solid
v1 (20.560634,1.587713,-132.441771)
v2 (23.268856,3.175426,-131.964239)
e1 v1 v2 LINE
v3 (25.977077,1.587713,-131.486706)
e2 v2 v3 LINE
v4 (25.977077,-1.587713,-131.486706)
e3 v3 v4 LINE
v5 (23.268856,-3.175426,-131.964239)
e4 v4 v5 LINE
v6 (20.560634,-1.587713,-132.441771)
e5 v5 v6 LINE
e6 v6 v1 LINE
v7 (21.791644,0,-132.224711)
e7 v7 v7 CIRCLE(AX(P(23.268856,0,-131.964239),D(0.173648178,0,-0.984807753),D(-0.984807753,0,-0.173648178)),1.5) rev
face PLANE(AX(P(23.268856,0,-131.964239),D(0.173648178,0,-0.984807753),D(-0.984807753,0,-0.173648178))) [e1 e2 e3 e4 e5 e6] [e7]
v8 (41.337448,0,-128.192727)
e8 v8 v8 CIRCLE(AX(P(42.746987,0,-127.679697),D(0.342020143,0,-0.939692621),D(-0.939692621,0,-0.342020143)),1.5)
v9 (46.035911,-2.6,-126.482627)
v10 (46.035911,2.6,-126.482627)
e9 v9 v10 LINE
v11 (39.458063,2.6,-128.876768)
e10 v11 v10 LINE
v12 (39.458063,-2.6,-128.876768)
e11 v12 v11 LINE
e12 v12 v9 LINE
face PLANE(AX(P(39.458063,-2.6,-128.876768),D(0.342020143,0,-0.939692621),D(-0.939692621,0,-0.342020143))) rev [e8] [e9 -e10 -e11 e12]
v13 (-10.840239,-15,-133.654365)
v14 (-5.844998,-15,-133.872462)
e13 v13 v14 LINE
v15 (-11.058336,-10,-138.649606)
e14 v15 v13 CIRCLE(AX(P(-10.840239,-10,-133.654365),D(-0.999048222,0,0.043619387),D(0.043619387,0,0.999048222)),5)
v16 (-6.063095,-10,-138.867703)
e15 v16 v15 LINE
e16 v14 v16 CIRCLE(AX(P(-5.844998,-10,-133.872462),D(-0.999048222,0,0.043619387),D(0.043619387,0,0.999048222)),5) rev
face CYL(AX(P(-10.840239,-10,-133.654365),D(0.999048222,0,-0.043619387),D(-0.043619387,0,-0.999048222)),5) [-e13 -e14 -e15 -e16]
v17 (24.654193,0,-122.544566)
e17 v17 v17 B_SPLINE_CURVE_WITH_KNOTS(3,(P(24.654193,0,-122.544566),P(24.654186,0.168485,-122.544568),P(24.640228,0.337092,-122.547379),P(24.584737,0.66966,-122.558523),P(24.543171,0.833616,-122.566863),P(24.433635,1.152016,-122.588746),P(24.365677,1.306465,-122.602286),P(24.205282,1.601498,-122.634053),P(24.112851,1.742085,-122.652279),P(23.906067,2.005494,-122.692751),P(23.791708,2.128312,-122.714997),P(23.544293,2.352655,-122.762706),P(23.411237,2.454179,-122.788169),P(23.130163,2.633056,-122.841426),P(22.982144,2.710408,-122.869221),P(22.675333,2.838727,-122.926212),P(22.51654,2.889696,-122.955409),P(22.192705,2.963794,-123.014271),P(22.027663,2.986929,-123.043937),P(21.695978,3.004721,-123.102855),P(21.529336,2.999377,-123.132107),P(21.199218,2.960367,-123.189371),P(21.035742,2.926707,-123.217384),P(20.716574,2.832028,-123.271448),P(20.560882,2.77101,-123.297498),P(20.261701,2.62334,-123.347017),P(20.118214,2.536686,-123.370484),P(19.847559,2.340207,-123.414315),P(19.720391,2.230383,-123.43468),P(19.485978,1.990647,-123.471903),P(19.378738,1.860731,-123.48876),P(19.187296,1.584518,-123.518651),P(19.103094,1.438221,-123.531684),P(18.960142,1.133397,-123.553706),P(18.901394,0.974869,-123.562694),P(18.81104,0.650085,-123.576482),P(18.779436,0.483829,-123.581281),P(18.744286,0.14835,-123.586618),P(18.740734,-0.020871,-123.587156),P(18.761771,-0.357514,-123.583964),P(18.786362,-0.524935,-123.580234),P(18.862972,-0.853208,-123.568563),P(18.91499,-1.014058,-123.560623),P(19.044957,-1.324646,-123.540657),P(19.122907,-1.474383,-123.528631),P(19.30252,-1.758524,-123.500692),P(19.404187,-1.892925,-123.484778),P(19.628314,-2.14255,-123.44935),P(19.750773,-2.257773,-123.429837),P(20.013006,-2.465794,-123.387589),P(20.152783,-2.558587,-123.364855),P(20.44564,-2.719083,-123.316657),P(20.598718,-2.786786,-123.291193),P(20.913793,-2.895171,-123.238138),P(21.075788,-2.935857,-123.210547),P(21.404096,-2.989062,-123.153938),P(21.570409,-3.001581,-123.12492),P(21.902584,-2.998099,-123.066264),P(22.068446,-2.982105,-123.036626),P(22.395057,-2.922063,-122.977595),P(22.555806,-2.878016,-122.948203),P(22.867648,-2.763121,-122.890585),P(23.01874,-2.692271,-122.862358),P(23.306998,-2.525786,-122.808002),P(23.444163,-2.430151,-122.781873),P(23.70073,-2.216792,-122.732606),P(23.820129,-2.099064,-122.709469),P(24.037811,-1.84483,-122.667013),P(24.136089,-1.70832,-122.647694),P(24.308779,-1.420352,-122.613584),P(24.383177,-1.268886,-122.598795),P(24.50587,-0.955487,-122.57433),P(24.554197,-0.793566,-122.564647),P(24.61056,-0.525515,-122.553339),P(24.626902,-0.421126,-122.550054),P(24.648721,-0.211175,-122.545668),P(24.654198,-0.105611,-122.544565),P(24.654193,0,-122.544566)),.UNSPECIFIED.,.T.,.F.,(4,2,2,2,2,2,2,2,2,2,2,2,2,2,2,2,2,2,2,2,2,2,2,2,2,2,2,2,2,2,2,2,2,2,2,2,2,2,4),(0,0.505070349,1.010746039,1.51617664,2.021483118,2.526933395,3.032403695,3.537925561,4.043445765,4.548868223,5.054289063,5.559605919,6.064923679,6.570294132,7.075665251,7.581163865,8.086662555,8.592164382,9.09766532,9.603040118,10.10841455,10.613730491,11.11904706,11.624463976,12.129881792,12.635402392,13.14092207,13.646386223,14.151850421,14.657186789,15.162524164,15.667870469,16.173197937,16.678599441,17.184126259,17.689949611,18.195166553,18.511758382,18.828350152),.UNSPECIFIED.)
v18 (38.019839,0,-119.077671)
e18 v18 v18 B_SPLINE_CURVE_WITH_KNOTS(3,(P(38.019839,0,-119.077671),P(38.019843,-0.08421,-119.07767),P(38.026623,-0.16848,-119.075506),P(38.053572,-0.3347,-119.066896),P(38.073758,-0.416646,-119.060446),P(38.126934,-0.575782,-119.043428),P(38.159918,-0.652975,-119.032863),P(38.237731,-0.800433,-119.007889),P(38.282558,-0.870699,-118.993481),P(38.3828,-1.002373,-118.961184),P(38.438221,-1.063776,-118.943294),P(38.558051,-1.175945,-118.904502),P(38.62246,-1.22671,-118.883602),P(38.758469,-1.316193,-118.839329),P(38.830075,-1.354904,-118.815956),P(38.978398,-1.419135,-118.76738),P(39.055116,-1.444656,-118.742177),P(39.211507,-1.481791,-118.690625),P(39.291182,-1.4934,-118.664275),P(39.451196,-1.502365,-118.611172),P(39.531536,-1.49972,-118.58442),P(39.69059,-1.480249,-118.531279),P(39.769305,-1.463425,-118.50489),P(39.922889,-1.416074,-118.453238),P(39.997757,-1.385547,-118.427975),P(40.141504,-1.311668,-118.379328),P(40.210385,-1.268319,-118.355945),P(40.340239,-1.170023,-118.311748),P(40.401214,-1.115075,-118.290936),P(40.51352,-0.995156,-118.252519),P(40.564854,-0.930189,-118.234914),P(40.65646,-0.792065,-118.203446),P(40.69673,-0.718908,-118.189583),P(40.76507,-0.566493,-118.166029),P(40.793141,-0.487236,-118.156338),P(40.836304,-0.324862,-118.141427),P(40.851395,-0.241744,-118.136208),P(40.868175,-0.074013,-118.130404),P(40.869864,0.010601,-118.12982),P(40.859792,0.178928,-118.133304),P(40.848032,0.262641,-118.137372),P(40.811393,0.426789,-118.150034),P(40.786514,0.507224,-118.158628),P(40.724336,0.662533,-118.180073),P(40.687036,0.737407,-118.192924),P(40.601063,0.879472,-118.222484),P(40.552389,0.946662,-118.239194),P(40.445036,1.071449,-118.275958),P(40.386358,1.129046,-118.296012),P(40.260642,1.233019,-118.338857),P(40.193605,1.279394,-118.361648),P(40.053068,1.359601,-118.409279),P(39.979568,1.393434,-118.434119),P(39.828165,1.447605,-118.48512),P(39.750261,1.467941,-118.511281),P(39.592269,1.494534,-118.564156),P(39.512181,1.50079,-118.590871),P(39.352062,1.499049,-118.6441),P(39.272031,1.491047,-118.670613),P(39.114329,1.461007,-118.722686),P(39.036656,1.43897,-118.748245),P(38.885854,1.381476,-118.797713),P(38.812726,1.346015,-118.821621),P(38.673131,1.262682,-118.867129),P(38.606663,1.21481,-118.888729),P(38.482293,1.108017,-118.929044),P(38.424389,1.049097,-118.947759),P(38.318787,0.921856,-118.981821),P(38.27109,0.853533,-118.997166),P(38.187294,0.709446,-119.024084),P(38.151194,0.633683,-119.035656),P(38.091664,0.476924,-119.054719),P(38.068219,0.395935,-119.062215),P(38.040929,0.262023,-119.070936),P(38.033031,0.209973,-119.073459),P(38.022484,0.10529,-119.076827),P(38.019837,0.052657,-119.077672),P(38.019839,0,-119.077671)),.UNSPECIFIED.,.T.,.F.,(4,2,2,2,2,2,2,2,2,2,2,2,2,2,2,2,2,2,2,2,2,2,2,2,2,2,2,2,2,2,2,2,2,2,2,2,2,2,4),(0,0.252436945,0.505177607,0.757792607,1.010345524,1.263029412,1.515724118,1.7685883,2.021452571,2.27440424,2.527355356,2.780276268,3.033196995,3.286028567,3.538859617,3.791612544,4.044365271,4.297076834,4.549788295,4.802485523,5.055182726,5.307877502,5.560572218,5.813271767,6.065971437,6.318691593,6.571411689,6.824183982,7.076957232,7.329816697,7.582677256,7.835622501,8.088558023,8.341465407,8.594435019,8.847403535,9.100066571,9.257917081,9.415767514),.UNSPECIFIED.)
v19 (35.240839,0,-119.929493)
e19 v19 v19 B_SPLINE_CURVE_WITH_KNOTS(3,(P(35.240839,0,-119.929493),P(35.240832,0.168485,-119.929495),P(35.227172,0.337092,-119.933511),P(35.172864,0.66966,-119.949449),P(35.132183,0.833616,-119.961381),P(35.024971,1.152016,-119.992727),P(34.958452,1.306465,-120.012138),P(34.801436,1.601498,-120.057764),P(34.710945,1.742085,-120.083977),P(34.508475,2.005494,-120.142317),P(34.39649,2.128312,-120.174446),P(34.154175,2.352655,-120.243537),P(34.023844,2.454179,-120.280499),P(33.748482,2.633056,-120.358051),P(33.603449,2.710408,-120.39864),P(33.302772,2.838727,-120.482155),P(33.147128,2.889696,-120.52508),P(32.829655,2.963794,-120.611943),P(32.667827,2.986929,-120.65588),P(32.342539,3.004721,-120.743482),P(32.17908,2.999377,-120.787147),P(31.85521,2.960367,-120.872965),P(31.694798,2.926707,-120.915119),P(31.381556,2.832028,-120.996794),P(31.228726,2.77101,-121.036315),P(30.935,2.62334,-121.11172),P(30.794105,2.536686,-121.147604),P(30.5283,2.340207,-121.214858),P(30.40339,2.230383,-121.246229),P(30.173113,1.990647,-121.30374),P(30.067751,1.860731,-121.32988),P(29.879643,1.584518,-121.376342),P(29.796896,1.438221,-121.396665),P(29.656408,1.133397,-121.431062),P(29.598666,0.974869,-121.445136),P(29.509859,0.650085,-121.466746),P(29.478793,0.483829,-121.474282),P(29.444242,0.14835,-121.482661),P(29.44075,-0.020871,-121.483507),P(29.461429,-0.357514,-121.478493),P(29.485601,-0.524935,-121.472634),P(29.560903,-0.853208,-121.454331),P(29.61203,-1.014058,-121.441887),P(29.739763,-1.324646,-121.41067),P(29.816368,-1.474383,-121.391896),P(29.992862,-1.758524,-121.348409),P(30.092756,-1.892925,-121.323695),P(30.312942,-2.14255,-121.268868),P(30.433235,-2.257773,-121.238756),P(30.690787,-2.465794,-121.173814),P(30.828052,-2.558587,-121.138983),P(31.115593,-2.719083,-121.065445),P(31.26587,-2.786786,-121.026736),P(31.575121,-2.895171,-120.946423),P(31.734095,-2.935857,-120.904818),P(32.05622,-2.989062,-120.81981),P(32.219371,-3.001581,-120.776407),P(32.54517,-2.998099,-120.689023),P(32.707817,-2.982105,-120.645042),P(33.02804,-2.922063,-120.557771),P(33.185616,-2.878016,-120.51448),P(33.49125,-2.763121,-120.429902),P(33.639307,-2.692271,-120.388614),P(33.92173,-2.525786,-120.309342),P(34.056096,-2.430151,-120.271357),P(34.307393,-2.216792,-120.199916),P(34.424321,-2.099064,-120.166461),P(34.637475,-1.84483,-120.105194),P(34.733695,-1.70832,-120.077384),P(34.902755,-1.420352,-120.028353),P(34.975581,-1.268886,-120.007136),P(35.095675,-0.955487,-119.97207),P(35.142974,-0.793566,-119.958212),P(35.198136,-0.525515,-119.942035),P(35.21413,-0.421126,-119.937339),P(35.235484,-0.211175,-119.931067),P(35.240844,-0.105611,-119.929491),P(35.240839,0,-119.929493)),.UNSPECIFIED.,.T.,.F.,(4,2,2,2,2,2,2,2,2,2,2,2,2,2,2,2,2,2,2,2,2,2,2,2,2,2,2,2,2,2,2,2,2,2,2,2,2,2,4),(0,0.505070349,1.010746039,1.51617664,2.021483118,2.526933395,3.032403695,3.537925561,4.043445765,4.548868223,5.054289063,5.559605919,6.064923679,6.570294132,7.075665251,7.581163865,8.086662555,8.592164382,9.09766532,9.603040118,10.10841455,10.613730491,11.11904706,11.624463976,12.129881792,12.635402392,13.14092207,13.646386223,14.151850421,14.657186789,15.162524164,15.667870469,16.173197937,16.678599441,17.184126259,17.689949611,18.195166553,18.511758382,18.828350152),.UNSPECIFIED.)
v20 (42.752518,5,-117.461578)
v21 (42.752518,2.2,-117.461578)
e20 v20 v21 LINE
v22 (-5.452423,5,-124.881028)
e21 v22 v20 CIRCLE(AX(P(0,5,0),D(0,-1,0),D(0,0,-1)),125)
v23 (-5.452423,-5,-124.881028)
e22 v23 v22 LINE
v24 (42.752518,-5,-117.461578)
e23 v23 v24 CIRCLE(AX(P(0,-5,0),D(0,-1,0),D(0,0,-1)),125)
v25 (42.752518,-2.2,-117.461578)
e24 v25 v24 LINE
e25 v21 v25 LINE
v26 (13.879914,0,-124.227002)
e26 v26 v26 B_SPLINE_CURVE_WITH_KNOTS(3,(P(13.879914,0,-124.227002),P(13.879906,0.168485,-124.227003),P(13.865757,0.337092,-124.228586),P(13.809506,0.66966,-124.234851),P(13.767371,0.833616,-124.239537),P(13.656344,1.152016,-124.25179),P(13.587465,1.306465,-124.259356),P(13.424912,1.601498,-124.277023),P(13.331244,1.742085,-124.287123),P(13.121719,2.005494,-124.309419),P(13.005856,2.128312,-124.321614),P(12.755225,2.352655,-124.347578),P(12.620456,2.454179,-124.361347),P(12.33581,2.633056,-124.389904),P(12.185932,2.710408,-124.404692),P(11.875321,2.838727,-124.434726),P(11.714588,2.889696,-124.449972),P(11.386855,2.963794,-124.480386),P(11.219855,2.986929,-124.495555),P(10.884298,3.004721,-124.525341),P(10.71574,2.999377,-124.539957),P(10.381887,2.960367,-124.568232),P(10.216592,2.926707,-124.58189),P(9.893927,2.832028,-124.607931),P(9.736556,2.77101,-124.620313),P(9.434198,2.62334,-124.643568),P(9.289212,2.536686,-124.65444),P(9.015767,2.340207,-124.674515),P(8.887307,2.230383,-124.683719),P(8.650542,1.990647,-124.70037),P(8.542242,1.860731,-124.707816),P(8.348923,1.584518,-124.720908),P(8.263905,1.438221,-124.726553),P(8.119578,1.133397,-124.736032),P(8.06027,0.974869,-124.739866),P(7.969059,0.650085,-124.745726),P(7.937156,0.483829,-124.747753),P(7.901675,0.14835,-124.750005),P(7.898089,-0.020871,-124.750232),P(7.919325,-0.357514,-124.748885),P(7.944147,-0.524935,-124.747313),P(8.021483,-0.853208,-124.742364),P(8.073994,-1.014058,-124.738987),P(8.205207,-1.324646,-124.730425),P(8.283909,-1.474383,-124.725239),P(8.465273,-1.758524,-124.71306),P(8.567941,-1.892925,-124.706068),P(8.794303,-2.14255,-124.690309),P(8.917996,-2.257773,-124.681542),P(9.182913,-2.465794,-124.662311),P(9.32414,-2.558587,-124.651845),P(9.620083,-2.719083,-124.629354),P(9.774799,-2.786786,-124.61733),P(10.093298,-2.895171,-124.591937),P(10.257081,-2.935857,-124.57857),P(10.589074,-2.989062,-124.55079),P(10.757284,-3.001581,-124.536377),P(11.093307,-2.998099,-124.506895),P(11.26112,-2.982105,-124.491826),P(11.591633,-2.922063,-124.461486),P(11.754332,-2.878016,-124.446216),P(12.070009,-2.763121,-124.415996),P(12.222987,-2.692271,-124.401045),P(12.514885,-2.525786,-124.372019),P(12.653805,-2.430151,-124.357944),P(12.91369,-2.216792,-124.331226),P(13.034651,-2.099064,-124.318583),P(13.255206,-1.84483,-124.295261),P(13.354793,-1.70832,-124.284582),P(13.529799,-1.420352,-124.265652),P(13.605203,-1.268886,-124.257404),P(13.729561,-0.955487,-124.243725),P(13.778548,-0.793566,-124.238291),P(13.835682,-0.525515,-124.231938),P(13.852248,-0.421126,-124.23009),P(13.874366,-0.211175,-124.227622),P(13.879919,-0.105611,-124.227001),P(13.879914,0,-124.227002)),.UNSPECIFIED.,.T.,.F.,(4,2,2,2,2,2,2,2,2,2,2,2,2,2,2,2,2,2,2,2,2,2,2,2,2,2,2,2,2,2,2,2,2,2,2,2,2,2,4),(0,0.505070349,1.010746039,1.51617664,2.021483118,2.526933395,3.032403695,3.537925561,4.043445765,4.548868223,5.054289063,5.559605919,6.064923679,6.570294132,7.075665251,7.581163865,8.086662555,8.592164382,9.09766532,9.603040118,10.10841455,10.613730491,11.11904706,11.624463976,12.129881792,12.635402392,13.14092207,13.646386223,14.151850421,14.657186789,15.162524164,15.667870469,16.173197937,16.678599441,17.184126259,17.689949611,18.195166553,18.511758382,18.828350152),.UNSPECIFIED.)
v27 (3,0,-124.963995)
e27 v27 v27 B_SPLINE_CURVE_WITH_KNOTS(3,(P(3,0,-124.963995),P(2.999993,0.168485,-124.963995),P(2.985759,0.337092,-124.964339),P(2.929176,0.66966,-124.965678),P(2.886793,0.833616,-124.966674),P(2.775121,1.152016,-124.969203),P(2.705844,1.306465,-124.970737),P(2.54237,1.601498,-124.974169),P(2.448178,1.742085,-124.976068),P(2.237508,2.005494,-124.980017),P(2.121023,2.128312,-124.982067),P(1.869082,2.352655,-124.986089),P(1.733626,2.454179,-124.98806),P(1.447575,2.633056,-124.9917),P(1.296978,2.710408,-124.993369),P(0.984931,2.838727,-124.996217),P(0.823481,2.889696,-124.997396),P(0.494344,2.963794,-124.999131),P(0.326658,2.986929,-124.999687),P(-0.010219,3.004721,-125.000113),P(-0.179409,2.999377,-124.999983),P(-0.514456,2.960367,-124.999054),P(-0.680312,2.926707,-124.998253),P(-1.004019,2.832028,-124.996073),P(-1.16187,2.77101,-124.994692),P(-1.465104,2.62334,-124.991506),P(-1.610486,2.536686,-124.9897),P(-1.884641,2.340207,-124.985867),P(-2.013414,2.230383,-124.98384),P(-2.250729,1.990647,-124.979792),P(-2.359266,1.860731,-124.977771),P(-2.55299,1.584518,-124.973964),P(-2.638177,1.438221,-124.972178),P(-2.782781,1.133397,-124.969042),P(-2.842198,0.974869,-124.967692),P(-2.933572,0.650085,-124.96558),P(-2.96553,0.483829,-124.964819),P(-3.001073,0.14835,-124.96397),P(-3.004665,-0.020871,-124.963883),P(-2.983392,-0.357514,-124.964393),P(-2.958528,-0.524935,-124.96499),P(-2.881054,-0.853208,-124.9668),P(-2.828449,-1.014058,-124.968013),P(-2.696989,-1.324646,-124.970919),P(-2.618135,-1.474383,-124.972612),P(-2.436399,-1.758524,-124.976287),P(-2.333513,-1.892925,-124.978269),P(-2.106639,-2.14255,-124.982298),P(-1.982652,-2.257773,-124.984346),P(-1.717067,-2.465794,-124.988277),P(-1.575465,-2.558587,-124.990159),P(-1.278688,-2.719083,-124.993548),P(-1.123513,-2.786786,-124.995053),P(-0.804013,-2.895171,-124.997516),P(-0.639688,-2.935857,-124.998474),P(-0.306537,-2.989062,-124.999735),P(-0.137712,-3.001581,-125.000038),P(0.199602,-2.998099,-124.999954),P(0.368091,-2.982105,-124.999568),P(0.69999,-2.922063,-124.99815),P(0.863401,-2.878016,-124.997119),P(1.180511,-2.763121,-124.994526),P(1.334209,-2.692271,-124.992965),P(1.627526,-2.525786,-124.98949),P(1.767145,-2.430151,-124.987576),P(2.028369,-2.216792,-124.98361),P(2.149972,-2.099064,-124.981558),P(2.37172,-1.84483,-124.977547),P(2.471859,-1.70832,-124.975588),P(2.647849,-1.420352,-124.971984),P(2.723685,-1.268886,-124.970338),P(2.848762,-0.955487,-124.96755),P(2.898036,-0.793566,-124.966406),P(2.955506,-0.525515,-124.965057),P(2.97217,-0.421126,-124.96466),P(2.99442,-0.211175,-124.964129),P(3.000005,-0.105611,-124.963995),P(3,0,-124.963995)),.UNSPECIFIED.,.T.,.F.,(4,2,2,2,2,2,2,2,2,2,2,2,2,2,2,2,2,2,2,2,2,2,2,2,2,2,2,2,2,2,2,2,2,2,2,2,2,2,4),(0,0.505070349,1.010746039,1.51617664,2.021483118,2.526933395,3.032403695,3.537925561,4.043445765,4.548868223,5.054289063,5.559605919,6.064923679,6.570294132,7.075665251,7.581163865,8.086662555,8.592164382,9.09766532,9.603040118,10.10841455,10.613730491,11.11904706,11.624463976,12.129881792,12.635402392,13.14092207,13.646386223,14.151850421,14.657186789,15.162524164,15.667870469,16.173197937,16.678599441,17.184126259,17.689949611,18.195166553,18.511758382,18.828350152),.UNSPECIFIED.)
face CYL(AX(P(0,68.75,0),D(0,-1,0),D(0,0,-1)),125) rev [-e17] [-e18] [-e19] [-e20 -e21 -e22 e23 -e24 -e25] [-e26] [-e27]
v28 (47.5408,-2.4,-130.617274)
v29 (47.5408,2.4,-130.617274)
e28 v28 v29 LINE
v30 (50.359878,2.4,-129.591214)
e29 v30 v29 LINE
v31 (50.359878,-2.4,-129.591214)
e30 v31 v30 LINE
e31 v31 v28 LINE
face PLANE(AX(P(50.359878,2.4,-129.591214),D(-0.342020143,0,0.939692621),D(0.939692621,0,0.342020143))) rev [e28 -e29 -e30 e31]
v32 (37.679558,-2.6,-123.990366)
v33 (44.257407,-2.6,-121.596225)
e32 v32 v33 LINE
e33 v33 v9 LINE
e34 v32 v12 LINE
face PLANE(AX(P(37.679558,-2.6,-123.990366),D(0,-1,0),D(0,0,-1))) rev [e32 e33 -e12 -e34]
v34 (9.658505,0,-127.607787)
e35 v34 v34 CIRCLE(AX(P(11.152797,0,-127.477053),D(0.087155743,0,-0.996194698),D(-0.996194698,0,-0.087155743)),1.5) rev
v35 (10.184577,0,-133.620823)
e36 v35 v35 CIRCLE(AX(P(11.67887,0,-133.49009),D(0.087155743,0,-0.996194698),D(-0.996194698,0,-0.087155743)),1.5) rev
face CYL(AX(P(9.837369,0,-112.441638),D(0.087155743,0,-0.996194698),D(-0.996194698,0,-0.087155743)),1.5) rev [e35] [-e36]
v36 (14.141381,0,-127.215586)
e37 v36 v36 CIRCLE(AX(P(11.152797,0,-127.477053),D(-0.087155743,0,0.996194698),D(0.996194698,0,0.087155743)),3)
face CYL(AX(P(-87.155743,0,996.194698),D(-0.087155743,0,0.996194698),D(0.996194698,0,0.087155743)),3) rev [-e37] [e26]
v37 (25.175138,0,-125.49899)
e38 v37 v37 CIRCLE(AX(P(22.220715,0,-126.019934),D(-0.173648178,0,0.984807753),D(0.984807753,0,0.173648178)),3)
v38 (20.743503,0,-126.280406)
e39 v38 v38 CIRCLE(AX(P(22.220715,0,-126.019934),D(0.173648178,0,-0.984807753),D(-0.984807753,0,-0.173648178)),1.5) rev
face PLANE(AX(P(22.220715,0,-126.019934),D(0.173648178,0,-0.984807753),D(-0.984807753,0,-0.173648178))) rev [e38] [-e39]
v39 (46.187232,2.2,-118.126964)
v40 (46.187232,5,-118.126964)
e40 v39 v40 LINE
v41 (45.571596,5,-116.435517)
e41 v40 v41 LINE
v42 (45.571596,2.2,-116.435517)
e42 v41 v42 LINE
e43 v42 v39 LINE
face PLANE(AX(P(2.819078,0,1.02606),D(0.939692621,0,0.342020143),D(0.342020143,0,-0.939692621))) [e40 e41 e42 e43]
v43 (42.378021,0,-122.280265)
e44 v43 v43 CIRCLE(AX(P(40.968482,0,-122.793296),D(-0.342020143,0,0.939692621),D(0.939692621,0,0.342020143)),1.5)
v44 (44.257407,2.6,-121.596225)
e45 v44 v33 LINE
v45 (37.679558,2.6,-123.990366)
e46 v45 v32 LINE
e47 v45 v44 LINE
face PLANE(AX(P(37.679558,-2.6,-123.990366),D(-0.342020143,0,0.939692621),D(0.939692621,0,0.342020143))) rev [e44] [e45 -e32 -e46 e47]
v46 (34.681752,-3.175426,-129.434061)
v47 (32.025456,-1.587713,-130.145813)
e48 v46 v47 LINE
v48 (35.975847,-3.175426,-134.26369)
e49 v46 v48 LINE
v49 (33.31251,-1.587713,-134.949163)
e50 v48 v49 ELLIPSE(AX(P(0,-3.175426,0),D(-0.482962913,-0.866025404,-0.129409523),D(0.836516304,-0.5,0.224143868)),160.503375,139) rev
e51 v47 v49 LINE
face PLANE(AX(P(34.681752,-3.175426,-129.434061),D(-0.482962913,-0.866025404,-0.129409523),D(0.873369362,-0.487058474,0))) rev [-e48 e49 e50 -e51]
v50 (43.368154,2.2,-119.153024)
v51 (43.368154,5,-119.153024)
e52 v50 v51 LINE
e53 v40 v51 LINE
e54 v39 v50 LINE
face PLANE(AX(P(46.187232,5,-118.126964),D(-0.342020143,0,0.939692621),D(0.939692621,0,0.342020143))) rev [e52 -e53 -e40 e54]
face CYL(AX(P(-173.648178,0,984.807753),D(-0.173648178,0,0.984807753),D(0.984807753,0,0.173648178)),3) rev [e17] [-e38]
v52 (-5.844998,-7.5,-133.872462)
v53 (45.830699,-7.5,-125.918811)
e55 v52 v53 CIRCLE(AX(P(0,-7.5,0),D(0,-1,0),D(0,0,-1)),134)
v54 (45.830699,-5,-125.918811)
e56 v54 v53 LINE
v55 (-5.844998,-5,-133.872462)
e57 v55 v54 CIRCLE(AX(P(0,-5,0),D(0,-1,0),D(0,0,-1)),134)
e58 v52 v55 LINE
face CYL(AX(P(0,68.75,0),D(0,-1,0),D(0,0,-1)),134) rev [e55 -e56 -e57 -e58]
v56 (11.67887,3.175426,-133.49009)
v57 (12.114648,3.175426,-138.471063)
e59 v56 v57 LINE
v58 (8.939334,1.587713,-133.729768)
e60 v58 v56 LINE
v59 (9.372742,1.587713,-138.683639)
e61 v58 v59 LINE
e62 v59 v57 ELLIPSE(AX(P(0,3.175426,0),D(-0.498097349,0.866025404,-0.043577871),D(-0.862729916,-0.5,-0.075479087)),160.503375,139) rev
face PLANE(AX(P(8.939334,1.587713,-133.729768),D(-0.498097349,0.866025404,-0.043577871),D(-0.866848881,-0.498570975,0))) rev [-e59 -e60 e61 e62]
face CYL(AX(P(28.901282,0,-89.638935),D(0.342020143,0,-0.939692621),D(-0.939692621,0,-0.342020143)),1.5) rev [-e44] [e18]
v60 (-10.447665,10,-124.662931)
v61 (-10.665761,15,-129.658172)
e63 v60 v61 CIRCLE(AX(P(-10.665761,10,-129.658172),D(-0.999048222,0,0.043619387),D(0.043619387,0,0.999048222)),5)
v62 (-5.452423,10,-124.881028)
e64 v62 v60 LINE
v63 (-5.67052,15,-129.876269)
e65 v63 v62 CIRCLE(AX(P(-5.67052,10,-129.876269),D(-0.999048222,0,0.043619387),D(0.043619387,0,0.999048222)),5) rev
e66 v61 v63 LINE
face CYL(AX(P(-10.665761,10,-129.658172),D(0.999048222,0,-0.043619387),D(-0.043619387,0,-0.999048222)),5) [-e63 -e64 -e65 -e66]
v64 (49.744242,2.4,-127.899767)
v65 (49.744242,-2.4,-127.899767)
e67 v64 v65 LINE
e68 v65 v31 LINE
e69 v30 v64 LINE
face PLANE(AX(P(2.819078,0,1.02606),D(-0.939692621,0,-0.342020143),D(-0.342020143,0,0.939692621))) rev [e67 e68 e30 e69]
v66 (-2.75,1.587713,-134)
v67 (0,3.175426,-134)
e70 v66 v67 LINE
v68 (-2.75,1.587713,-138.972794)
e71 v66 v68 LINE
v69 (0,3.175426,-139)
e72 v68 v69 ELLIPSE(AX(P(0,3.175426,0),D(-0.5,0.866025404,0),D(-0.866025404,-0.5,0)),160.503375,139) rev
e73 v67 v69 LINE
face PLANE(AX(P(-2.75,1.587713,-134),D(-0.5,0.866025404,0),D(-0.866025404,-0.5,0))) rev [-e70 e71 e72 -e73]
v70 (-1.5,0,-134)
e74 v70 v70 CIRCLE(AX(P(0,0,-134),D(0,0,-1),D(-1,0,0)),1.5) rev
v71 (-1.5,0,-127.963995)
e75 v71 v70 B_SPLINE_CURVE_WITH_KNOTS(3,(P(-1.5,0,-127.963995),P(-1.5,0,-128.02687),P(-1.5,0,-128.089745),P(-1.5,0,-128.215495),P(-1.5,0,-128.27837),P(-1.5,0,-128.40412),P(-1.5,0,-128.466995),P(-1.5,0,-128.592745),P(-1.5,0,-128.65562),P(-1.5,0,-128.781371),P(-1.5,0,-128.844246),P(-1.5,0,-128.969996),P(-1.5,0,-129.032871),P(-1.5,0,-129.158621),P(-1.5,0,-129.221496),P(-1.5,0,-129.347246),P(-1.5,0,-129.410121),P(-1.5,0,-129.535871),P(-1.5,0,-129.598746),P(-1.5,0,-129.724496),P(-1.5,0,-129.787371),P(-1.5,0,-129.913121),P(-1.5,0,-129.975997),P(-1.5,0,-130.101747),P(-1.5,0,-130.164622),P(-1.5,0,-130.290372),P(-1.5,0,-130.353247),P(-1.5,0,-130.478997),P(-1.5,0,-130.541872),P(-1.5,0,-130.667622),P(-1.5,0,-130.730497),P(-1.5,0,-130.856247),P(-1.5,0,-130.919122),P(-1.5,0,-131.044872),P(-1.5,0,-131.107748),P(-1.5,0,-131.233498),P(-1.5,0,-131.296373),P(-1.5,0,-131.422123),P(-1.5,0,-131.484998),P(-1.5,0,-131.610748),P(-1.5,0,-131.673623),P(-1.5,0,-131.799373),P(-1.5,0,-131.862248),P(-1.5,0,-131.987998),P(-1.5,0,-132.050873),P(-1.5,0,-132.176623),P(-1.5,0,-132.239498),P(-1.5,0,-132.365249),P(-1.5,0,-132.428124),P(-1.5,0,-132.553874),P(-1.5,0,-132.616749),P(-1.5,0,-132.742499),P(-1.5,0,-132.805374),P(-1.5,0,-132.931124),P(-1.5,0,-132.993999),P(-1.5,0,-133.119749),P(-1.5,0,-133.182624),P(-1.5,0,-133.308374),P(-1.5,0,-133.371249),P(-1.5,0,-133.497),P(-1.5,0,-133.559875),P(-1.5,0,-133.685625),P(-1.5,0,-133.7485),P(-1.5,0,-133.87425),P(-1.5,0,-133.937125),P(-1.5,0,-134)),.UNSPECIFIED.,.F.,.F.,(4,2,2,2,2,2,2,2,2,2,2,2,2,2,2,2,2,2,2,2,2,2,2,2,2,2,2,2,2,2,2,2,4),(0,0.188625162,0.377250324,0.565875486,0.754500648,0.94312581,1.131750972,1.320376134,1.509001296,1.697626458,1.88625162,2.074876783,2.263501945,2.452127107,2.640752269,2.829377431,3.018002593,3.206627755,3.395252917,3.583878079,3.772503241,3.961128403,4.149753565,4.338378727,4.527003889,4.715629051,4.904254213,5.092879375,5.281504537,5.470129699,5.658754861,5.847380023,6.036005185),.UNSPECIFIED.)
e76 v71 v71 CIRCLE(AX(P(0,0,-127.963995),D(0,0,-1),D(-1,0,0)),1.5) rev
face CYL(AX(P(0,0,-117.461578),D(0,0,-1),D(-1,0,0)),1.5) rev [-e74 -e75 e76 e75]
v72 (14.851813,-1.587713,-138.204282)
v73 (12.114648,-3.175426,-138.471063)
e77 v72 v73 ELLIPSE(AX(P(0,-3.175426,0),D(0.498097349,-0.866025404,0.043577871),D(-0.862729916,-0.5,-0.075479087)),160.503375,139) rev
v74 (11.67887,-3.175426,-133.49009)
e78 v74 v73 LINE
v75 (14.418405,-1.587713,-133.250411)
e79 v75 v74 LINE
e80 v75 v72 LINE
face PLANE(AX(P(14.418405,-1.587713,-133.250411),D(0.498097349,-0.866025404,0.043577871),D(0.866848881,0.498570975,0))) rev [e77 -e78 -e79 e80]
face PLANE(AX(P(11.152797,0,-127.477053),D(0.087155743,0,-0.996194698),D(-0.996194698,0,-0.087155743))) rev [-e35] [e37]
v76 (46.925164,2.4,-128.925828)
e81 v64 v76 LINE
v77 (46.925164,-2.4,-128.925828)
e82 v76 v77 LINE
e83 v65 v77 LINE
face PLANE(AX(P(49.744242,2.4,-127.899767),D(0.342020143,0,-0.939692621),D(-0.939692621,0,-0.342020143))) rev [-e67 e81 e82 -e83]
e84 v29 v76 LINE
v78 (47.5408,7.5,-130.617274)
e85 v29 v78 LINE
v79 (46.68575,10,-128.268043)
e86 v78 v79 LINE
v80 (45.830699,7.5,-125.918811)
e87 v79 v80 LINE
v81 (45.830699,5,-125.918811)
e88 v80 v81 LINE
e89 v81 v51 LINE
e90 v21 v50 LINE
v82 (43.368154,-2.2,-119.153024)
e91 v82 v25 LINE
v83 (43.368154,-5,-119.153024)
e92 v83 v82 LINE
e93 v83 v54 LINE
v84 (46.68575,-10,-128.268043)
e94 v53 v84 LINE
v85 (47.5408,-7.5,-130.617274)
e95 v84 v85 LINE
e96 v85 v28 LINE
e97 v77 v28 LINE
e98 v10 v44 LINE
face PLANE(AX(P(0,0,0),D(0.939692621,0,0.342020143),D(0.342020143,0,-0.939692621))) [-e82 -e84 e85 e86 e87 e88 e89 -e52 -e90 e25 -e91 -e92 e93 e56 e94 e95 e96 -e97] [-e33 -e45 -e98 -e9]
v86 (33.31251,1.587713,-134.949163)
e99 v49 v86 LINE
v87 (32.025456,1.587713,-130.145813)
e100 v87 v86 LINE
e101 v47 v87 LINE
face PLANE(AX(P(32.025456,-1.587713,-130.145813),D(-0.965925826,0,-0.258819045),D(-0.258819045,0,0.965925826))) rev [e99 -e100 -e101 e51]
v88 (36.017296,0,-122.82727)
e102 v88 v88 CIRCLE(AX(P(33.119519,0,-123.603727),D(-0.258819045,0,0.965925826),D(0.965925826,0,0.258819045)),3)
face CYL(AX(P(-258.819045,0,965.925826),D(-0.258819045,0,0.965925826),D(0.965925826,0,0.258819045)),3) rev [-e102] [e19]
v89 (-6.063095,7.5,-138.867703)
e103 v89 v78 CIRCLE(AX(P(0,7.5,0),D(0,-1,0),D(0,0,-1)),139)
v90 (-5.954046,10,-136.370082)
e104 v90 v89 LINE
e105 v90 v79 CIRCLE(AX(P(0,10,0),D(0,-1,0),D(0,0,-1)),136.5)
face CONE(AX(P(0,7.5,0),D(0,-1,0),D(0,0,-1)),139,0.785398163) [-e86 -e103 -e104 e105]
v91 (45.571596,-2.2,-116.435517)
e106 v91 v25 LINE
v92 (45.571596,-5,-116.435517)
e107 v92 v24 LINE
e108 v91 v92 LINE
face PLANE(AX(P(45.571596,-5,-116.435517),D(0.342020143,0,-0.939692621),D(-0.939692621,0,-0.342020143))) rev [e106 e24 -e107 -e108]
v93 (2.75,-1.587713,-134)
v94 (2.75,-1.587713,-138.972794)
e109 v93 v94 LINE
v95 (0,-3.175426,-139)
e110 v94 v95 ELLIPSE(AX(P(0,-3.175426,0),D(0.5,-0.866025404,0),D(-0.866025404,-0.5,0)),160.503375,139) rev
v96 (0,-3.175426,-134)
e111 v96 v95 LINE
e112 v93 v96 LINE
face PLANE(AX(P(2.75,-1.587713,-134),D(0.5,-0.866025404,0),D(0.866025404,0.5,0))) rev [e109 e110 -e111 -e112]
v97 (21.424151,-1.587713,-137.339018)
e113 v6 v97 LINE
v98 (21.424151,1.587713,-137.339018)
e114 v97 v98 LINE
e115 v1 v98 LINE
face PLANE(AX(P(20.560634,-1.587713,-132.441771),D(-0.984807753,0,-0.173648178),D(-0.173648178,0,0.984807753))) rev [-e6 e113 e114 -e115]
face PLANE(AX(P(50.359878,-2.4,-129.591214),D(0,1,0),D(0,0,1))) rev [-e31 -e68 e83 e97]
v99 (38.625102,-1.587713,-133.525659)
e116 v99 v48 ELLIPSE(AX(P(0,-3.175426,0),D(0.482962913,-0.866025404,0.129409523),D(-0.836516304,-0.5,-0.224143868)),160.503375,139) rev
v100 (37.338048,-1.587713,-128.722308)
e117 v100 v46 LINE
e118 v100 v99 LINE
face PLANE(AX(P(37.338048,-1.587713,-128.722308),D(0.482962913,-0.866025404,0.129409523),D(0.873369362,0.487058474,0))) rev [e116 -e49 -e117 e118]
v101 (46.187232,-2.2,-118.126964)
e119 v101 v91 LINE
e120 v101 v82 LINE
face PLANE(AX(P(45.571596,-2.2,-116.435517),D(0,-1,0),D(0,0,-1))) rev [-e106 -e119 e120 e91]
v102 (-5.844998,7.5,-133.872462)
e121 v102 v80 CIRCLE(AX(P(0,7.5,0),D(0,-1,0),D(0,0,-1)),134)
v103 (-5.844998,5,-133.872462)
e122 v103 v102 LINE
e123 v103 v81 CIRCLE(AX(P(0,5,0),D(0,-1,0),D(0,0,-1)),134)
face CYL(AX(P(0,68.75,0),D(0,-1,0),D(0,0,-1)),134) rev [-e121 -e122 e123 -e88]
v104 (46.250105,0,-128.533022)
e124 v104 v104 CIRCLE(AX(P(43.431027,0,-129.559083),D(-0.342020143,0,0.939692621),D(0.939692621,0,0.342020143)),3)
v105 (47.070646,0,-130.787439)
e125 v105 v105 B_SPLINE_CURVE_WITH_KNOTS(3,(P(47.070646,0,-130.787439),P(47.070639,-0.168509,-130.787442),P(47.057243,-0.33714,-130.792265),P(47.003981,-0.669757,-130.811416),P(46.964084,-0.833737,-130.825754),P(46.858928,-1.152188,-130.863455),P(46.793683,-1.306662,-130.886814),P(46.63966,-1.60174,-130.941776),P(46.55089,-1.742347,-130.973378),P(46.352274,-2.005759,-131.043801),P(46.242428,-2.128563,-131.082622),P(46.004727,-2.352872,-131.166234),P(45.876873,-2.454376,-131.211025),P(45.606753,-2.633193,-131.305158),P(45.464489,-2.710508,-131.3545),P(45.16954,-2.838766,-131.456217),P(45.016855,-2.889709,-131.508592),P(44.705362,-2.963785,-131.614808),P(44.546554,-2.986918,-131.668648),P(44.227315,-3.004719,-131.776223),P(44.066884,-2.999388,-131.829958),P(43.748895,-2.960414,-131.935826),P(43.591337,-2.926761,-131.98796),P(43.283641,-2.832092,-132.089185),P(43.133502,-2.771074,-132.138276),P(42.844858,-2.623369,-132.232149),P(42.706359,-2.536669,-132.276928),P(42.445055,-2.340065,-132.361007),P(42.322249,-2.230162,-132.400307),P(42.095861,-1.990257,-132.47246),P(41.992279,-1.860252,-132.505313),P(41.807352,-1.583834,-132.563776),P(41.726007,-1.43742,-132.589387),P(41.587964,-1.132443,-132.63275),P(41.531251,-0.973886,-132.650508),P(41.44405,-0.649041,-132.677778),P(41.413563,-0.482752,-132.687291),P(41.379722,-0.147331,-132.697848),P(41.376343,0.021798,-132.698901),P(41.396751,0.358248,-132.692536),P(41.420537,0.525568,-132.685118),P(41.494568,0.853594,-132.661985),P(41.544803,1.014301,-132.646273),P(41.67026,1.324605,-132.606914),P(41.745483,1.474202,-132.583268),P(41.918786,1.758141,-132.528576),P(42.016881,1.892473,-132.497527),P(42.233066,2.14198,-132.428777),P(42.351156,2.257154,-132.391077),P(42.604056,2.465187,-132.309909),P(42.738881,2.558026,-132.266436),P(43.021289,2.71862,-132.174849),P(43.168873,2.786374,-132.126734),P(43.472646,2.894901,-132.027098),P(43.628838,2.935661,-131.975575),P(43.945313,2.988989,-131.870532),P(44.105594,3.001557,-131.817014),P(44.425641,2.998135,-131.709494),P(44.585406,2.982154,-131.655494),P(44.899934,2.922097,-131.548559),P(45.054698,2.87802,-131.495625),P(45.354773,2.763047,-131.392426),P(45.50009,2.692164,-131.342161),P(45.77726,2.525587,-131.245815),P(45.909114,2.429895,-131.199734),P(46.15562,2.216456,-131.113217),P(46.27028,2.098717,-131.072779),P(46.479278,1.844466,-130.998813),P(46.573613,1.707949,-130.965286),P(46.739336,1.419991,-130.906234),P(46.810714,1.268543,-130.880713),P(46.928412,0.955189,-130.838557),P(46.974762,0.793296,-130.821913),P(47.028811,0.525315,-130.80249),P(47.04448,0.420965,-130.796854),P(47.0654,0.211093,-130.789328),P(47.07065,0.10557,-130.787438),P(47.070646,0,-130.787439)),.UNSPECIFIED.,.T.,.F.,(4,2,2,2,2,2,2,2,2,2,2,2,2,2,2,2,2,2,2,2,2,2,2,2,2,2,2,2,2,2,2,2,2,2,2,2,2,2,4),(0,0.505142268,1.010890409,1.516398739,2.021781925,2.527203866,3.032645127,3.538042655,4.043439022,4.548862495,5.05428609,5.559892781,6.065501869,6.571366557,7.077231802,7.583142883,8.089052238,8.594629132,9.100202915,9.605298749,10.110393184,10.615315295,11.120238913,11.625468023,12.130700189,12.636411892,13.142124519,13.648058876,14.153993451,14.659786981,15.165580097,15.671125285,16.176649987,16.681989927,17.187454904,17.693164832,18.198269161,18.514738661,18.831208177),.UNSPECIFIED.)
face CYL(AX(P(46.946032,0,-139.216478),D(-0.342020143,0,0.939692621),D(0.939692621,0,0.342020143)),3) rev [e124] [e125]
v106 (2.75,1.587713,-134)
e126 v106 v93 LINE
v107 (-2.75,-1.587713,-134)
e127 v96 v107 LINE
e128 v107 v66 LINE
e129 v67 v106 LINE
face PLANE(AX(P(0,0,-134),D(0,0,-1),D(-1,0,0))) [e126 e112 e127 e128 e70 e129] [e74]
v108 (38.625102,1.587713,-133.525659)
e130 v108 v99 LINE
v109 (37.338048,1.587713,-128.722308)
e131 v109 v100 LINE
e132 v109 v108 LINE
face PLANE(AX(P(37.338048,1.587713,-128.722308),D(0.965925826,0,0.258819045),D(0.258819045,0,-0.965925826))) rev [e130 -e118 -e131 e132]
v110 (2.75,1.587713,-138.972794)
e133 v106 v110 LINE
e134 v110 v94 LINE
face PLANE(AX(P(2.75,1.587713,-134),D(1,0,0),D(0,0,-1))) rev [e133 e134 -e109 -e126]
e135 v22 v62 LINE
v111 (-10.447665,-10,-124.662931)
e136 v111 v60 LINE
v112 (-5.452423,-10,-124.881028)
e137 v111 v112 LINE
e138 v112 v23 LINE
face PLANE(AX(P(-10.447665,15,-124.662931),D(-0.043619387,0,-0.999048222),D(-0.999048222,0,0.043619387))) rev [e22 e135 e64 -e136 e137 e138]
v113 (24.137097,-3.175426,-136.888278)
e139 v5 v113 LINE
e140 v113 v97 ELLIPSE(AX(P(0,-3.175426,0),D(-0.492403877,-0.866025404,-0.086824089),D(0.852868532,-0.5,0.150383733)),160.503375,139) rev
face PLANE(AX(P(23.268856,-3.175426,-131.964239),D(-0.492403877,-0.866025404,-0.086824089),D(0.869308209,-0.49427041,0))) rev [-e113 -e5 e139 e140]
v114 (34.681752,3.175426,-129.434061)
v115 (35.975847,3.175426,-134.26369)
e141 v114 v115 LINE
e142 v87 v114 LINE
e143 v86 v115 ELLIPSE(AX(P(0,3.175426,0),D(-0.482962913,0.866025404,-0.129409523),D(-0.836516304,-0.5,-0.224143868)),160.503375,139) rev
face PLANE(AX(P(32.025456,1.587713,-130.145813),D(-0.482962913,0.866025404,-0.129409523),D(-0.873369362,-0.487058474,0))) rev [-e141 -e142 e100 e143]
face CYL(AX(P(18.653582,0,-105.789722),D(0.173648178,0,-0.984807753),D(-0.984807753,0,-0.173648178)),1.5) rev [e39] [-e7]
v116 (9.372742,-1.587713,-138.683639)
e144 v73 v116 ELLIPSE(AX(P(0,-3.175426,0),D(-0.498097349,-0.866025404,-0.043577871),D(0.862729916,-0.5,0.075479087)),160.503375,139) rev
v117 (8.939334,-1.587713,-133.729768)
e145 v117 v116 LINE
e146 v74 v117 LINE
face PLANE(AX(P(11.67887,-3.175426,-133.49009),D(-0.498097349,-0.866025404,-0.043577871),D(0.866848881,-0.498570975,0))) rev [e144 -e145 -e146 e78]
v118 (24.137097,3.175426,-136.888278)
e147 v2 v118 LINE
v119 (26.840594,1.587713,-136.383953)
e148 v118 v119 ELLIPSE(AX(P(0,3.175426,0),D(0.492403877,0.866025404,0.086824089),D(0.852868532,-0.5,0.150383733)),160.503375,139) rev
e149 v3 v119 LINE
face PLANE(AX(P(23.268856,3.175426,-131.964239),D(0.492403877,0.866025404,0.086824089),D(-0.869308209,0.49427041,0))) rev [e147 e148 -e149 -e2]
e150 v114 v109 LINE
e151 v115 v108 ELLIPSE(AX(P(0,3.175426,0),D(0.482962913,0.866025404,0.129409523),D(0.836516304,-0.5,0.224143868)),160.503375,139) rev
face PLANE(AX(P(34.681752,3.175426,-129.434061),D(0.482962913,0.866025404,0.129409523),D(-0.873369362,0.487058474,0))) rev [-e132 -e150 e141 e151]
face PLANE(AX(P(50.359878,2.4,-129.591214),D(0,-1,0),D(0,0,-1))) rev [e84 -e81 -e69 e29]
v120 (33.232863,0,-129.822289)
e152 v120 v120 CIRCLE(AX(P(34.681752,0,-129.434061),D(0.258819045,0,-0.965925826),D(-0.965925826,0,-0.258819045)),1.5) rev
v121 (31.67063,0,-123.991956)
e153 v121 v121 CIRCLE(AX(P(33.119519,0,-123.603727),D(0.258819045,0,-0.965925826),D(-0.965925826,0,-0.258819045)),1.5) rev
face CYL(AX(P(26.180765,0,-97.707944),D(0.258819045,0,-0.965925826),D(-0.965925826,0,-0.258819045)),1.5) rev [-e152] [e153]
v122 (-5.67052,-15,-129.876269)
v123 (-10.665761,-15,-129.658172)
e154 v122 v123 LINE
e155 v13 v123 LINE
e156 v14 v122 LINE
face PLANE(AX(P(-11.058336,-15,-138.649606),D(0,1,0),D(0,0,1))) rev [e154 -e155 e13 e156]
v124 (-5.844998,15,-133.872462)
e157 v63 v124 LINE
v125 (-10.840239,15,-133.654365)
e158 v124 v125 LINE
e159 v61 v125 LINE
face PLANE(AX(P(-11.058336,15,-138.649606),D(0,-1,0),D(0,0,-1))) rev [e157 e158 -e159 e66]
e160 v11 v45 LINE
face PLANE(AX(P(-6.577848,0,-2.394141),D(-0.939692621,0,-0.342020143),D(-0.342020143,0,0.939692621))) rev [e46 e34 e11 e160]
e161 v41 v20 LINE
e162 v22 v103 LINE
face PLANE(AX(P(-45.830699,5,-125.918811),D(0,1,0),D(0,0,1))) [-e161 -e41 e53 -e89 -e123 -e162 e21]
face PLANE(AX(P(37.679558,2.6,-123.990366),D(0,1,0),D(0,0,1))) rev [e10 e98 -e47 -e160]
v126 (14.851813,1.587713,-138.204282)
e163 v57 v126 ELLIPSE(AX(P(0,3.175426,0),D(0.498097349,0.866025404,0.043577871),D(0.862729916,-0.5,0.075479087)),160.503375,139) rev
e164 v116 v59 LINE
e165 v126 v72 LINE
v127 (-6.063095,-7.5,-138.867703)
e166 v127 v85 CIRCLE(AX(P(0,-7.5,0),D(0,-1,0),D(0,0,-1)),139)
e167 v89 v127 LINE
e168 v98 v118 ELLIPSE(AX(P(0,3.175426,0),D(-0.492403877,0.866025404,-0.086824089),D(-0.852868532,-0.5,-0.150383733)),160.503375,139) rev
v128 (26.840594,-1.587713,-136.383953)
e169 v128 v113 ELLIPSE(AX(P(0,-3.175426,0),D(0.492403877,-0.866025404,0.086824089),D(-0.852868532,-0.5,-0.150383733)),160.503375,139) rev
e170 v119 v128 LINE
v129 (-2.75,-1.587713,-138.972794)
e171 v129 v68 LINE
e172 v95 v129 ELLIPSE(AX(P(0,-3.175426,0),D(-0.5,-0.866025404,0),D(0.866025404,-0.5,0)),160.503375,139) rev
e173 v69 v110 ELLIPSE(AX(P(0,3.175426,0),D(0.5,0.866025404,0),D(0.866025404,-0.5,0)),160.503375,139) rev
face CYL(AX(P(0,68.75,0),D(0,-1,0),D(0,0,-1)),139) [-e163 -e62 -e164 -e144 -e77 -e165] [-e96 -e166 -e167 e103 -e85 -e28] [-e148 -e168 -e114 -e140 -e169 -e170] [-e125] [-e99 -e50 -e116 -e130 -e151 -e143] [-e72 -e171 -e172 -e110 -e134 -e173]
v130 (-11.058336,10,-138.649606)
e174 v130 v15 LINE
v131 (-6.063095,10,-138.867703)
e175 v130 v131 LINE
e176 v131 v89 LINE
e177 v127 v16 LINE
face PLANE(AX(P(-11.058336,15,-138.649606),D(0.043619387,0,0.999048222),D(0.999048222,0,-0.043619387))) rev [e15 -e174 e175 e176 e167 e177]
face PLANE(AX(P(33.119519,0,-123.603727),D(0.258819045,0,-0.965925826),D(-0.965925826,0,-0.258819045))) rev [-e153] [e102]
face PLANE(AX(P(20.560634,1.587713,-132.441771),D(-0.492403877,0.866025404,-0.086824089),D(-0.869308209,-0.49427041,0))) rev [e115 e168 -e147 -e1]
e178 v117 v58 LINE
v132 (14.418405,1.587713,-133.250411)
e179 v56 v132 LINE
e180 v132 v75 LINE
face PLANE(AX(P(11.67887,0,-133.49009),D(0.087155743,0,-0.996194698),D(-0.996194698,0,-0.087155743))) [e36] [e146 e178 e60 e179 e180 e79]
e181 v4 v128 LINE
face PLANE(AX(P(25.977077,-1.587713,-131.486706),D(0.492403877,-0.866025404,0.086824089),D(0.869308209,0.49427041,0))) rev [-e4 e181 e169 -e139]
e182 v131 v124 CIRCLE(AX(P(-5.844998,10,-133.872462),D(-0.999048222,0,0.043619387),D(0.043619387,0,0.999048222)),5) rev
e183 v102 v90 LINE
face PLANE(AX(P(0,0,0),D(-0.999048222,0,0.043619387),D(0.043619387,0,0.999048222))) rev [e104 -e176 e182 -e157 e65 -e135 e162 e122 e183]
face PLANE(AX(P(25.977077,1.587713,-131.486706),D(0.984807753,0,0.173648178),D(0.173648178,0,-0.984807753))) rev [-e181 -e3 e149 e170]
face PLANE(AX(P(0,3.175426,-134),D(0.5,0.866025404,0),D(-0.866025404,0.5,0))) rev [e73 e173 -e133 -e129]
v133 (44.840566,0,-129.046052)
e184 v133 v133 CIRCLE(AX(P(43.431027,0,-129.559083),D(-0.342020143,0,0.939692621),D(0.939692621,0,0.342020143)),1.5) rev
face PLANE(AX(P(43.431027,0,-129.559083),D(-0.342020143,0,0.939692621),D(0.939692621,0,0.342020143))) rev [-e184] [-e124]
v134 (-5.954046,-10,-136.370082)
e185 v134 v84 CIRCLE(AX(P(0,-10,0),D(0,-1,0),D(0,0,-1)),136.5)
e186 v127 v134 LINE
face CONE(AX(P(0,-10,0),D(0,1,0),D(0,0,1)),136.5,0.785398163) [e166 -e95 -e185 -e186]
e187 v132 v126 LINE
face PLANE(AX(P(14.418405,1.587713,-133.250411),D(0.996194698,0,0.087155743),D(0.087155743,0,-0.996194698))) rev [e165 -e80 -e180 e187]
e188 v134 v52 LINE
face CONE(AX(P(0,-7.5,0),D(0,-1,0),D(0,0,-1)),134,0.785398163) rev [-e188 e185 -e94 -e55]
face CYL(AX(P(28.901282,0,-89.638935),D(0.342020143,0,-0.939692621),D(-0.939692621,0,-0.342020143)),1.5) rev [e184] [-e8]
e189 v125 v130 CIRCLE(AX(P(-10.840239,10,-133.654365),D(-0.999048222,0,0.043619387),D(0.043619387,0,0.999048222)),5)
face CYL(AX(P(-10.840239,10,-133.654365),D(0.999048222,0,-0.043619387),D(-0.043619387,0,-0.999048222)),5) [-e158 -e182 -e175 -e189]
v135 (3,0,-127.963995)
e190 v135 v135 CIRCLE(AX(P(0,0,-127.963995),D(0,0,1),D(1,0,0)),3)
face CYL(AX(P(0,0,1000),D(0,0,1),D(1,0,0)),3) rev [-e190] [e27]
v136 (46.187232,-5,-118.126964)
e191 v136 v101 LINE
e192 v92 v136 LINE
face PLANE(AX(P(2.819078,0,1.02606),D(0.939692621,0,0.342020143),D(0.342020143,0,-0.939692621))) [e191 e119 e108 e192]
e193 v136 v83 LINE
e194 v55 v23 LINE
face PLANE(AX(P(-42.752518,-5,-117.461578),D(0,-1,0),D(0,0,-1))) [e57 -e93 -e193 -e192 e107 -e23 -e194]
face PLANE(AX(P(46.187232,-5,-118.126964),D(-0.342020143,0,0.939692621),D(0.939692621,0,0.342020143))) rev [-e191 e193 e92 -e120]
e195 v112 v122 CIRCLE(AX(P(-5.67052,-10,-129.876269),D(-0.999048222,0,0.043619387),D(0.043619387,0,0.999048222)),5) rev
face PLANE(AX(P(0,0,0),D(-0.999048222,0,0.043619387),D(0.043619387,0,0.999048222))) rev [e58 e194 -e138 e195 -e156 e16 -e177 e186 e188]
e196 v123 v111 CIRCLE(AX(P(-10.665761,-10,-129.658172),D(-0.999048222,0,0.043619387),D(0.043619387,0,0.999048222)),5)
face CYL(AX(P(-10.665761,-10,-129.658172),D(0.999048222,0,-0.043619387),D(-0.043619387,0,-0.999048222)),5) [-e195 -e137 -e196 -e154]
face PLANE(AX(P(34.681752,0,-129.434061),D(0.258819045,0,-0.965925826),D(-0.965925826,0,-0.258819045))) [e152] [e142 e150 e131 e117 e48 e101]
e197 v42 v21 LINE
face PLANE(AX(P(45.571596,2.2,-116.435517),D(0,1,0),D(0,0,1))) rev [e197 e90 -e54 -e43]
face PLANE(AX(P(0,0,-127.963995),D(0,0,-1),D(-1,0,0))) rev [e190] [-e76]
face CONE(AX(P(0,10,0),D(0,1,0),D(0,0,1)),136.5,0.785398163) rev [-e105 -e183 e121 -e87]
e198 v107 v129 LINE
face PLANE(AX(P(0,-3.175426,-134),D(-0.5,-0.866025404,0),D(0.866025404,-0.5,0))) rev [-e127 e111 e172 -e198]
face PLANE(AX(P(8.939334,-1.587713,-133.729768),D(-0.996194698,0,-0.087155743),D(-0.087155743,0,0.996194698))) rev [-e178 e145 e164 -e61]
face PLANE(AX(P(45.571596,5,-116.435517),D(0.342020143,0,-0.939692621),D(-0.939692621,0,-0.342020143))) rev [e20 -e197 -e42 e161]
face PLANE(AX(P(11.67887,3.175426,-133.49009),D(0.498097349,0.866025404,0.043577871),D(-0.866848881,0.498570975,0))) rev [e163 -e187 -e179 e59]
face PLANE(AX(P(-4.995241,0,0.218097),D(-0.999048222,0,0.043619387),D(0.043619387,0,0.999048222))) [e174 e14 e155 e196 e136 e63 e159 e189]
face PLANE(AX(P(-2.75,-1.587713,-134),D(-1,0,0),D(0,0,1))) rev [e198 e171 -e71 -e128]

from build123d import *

# Parameters (mm, degrees)
REVOLVE_1_ANGLE          = 40
SKETCH_3_W               = 5.2
SKETCH_3_H               = 5.2
CUT_EXTRUDE_1_DEPTH      = 7
CUT_EXTRUDE_2_DEPTH      = 94.967026614
CUT_EXTRUDE_2_DEPTH_BACK = 94.967026614
SKETCH_5_R               = 1.5
CUT_EXTRUDE_START        = -2
SKETCH_6_R               = 3
CUT_EXTRUDE_3_DEPTH      = 93.938324905
SKETCH_12_R              = 1.5
CUT_EXTRUDE_5_DEPTH      = 54.141615619
CUT_EXTRUDE_6_DEPTH      = 5
SKETCH_14_W              = 3
SKETCH_14_H              = 3
PATTERN_CIRCULAR_1_COUNT = 4
PATTERN_CIRCULAR_1_ANGLE = 15
F_1_THE_OTHER_WAY_COUNT  = 4
F_1_THE_OTHER_WAY_ANGLE  = 15
SKETCH_9_W               = 1.8
SKETCH_9_H               = 4.8
SKETCH_9_H_2             = 2.8
EXTRUDE_2_DEPTH          = 3
SKETCH_10_W              = 52.448370613
SKETCH_10_H              = 39.953744926
CUT_EXTRUDE_4_DEPTH      = 149.179341739
SKETCH_11_W              = 14
SKETCH_11_H              = 30
EXTRUDE_3_DEPTH          = 5
FILLET_1_R               = 5


# Read off the part's stored shape, not the designer's step: 旋转1
with BuildPart() as part:
    # 旋转1 outline → 旋转1 (revolve)
    with BuildSketch(Plane(origin=(0, 0, 0), x_dir=(0.3420201433256701, 0, -0.9396926207859079), z_dir=(0.9396926207859079, 0, 0.3420201433256701))):
        Polygon((134, 5), (125, 5), (125, -5), (134, -5), (134, -7.5), (136.5, -10), (139, -7.5), (139, 7.5), (136.5, 10), (134, 7.5), align=None)
    revolve(axis=Axis((0, 0, 0), (0, 1, 0)), revolution_arc=REVOLVE_1_ANGLE)

    # 草图3 → 切除-拉伸1 (cut)
    with BuildSketch(Plane(origin=(0, 0, 0), x_dir=(0.34202014332566943, 0, -0.9396926207859081), z_dir=(0.9396926207859081, 0, 0.34202014332566943))):
        with Locations((132, 0)):
            Rectangle(SKETCH_3_W, SKETCH_3_H)
    extrude(amount=-CUT_EXTRUDE_1_DEPTH, mode=Mode.SUBTRACT)

    # 草图5 → 切除-拉伸2 (cut, two sides: drawn at the far end of the back side and taken through both)
    with BuildSketch(Plane(origin=(44.257406546, 0, -121.59622513), x_dir=(-0.9396926207859081, 0, -0.3420201433256695), z_dir=(0.3420201433256695, 0, -0.9396926207859081)).offset(-CUT_EXTRUDE_2_DEPTH_BACK)):
        with Locations((3.5, 0)):
            Circle(SKETCH_5_R)
    extrude(amount=CUT_EXTRUDE_2_DEPTH + CUT_EXTRUDE_2_DEPTH_BACK, mode=Mode.SUBTRACT)

    # 草图6 → 切除-拉伸3 (cut, through all)
    with BuildSketch(Plane(origin=(46.035911292, 0, -126.482626758), x_dir=(0.9396926207859081, 0, 0.3420201433256695), z_dir=(-0.3420201433256695, 0, 0.9396926207859081)).offset(CUT_EXTRUDE_START)):
        with Locations((-3.5, 0)):
            Circle(SKETCH_6_R)
    extrude(amount=-CUT_EXTRUDE_3_DEPTH, mode=Mode.SUBTRACT)

    # 草图12 → 切除-拉伸5 (cut, through all)
    with BuildSketch(Plane(origin=(0, 0, -139), x_dir=(-1, 0, 0), z_dir=(0, 0, -1))):
        Circle(SKETCH_12_R)
    cut_extrude_5 = extrude(amount=-CUT_EXTRUDE_5_DEPTH, mode=Mode.SUBTRACT)

    # 草图13 → 切除-拉伸6 (cut)
    with BuildSketch(Plane(origin=(0, 0, -139), x_dir=(-1, 0, 0), z_dir=(0, 0, -1))):
        Polygon((0, -3.175426481), (2.75, -1.58771324), (2.75, 1.58771324), (0, 3.175426481), (-2.75, 1.58771324), (-2.75, -1.58771324), align=None)
    cut_extrude_6 = extrude(amount=-CUT_EXTRUDE_6_DEPTH, mode=Mode.SUBTRACT)

    # 草图14 → 切除-旋转1 (revolve, cut)
    with BuildSketch(Plane(origin=(0, 0, 0), x_dir=(1, 0, 0), z_dir=(0, 1, 0)), mode=Mode.PRIVATE) as cut_revolve_1_sk:
        with Locations((1.5, 126.463994814)):
            Rectangle(SKETCH_14_W, SKETCH_14_H)
    cut_revolve_1 = revolve(cut_revolve_1_sk.sketch.rotate(Axis((0, 0, 1000), (0, 0, -1)), 180), axis=Axis((0, 0, 1000), (0, 0, -1)), mode=Mode.SUBTRACT)

    # 阵列(圆周)1: 切除-拉伸5, 切除-拉伸6, 切除-旋转1 ×4 about axis
    pattern_circular_1_axis = Axis((0, 0, 0), (0, 1, 0))
    add([cut_extrude_5.rotate(pattern_circular_1_axis, i * PATTERN_CIRCULAR_1_ANGLE / (PATTERN_CIRCULAR_1_COUNT - 1)) for i in range(1, PATTERN_CIRCULAR_1_COUNT)], mode=Mode.SUBTRACT)
    add([cut_extrude_6.rotate(pattern_circular_1_axis, i * PATTERN_CIRCULAR_1_ANGLE / (PATTERN_CIRCULAR_1_COUNT - 1)) for i in range(1, PATTERN_CIRCULAR_1_COUNT)], mode=Mode.SUBTRACT)
    add([cut_revolve_1.rotate(pattern_circular_1_axis, i * PATTERN_CIRCULAR_1_ANGLE / (PATTERN_CIRCULAR_1_COUNT - 1)) for i in range(1, PATTERN_CIRCULAR_1_COUNT)], mode=Mode.SUBTRACT)

    # 1 the other way: 切除-拉伸5, 切除-拉伸6, 切除-旋转1 ×4 about axis
    f_1_the_other_way_axis = Axis((0, 0, 0), (0, -1, 0))
    add([cut_extrude_5.rotate(f_1_the_other_way_axis, i * F_1_THE_OTHER_WAY_ANGLE / (F_1_THE_OTHER_WAY_COUNT - 1)) for i in range(1, F_1_THE_OTHER_WAY_COUNT)], mode=Mode.SUBTRACT)
    add([cut_extrude_6.rotate(f_1_the_other_way_axis, i * F_1_THE_OTHER_WAY_ANGLE / (F_1_THE_OTHER_WAY_COUNT - 1)) for i in range(1, F_1_THE_OTHER_WAY_COUNT)], mode=Mode.SUBTRACT)
    add([cut_revolve_1.rotate(f_1_the_other_way_axis, i * F_1_THE_OTHER_WAY_ANGLE / (F_1_THE_OTHER_WAY_COUNT - 1)) for i in range(1, F_1_THE_OTHER_WAY_COUNT)], mode=Mode.SUBTRACT)

    # 草图9 → 凸台-拉伸2 (add)
    with BuildSketch(Plane(origin=(0, 0, 0), x_dir=(0.34202014332566943, 0, -0.9396926207859082), z_dir=(0.9396926207859082, 0, 0.34202014332566943))):
        with Locations((138.1, 0)):
            Rectangle(SKETCH_9_W, SKETCH_9_H)
        with Locations((125.9, 3.6)):
            Rectangle(SKETCH_9_W, SKETCH_9_H_2)
        with Locations((125.9, -3.6)):
            Rectangle(SKETCH_9_W, SKETCH_9_H_2)
    extrude(amount=EXTRUDE_2_DEPTH)

    # 草图10 → 切除-拉伸4 (cut, through all)
    with BuildSketch(Plane(origin=(0, 0, 0), x_dir=(0, -1, 0), z_dir=(0.9990482215818578, 0, -0.04361938736533606))):
        with Locations((1.816079314, 125.001454628)):
            Rectangle(SKETCH_10_W, SKETCH_10_H)
    extrude(amount=-CUT_EXTRUDE_4_DEPTH, mode=Mode.SUBTRACT)

    # 草图11 → 凸台-拉伸3 (add)
    with BuildSketch(Plane(origin=(0, 0, 0), x_dir=(0.043619387365336076, 0, 0.9990482215818578), z_dir=(-0.9990482215818577, 0, 0.04361938736533607))):
        with Locations((-132, 0)):
            Rectangle(SKETCH_11_W, SKETCH_11_H)
    extrude(amount=EXTRUDE_3_DEPTH)

    # 圆角1
    fillet_1_edges = [part.edges().sort_by_distance(p)[0] for p in [
        (-8.560715398, 15, -138.758654331),
        (-8.560715398, -15, -138.758654331),
        (-7.950043975, -15, -124.771979229),
        (-7.950043975, 15, -124.771979229),
    ]]
    fillet(fillet_1_edges, radius=FILLET_1_R)


solid = part.part
